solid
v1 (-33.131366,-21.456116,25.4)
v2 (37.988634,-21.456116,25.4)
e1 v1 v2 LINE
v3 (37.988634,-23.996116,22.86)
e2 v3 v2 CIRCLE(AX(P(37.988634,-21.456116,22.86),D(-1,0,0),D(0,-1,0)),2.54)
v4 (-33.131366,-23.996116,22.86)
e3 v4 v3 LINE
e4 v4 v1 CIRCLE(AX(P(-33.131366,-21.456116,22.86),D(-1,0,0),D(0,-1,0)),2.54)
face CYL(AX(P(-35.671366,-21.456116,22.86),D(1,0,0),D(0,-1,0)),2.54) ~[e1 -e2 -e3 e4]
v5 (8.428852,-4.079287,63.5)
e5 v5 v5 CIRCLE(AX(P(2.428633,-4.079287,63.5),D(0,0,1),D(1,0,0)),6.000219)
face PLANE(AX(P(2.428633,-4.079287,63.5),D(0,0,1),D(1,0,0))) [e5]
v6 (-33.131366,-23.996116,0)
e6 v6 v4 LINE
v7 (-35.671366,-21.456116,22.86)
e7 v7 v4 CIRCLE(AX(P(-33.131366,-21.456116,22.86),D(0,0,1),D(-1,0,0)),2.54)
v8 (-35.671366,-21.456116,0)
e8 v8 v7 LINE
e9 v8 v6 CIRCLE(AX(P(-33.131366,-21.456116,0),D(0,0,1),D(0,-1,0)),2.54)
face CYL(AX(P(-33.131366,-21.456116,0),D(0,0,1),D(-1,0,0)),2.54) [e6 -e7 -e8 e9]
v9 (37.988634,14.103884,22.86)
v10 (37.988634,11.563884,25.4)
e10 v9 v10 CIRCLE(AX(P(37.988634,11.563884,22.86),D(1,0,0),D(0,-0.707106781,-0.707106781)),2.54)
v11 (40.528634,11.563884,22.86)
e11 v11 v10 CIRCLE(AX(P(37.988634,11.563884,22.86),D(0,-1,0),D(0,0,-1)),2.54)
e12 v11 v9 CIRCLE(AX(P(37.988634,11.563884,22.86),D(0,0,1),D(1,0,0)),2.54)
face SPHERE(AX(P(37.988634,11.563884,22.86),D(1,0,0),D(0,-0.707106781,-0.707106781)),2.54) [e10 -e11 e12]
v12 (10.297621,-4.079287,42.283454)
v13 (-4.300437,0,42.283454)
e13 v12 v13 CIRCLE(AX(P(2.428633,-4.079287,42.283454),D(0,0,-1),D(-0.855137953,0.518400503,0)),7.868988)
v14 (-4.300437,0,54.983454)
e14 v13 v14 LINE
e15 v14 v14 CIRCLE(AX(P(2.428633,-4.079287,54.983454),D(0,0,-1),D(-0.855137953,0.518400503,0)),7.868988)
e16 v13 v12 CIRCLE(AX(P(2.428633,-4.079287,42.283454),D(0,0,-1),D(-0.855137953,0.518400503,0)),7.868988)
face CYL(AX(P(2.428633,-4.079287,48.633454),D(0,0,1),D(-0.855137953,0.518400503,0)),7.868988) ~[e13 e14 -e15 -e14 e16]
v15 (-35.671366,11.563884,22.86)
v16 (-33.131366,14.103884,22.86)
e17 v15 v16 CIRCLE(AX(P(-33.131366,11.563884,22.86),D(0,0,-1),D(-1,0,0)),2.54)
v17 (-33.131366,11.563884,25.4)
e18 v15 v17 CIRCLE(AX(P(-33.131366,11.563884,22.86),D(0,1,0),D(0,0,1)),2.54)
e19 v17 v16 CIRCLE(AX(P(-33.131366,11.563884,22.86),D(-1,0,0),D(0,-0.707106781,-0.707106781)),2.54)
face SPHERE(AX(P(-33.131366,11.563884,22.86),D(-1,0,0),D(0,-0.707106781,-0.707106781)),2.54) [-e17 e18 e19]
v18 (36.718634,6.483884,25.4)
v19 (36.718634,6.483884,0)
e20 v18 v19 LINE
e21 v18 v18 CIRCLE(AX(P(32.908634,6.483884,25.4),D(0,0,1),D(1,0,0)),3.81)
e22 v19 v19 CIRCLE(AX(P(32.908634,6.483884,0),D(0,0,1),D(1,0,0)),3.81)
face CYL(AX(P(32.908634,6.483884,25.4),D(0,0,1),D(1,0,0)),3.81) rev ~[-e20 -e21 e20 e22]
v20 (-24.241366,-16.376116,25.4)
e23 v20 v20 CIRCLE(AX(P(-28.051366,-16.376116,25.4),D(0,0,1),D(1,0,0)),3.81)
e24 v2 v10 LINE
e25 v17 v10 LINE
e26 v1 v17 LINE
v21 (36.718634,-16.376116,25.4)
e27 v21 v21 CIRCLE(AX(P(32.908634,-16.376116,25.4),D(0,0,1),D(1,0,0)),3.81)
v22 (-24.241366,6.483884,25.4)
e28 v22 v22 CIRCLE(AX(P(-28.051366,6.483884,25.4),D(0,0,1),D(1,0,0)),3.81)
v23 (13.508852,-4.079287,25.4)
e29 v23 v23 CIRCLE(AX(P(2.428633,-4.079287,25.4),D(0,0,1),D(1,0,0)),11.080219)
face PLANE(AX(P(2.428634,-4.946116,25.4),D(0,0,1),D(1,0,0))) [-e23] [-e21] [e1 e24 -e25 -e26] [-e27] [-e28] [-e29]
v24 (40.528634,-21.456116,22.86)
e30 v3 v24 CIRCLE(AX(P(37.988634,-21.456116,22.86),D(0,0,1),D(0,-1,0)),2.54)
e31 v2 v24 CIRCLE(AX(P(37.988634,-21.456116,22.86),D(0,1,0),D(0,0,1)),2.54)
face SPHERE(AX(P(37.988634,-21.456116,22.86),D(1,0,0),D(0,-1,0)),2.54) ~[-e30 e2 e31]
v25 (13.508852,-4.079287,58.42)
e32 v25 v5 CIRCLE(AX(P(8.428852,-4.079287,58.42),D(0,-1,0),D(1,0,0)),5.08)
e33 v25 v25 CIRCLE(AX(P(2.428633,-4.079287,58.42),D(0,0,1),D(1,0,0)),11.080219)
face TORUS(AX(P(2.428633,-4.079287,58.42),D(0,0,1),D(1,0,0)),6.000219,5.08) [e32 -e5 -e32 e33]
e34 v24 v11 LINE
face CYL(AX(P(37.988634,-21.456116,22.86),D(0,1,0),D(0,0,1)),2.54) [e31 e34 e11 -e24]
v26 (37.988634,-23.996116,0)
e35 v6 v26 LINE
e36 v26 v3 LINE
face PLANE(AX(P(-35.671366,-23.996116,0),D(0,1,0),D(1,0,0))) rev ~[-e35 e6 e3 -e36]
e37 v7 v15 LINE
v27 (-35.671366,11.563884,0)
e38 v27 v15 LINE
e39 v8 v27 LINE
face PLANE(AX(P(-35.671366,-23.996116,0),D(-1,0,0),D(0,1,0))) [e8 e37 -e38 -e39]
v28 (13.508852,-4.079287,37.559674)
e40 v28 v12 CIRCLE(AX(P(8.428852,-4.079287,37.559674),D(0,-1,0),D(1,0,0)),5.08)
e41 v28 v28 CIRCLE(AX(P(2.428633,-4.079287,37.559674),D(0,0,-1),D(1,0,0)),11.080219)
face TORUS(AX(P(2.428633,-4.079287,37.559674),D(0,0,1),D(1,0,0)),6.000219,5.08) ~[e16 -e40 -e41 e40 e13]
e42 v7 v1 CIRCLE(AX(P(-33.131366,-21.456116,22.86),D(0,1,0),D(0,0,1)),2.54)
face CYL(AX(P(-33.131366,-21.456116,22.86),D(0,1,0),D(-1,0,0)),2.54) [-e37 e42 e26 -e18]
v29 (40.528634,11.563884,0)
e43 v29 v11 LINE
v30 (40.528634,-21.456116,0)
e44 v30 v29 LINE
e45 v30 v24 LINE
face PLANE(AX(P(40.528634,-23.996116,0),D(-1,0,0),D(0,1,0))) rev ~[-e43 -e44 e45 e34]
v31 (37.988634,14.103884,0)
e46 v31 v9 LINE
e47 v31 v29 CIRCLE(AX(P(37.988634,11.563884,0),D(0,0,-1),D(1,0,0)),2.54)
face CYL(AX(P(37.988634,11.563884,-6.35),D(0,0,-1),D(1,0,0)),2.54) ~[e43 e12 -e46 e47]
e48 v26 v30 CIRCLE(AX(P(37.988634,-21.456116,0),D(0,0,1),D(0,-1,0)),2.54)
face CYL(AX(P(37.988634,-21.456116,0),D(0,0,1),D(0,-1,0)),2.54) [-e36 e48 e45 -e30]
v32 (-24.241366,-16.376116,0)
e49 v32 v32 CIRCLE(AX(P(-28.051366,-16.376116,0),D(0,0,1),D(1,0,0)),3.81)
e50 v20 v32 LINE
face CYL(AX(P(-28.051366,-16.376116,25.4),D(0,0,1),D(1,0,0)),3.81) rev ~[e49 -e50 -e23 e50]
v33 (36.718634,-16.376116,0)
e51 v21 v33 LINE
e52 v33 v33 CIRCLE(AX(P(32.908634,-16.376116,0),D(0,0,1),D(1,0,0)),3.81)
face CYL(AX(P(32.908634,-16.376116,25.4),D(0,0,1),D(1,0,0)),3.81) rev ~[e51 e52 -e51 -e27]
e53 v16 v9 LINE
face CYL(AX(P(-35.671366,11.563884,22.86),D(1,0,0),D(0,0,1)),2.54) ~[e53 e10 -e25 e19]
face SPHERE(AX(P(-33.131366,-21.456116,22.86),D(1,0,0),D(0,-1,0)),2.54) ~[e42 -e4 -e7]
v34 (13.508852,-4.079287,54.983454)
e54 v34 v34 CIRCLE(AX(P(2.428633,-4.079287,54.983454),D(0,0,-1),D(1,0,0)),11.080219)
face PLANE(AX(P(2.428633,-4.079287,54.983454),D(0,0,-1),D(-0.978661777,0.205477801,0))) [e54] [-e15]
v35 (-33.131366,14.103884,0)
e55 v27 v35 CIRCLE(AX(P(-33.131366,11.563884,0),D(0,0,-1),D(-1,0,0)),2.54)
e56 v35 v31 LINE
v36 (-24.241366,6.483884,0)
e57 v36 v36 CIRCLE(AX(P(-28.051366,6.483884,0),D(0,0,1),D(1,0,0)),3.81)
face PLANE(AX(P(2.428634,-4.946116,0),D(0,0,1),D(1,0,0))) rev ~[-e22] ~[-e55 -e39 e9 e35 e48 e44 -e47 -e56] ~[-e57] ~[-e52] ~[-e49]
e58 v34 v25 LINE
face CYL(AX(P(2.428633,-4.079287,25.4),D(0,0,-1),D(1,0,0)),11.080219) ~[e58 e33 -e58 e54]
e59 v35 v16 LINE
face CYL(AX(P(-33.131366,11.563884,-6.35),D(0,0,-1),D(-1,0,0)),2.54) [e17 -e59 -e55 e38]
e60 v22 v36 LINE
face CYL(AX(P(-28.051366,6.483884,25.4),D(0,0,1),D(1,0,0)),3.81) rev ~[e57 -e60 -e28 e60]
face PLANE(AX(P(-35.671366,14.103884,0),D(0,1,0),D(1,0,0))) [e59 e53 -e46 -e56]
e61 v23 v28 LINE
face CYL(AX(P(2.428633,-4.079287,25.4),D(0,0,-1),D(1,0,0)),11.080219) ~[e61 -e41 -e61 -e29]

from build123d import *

# Parameters (mm, degrees)
F0_W          = 76.2
F0_H          = 38.1
F1_DEPTH      = 25.4
F3_R          = 3.81
F4_DEPTH      = 25.4
F5_R          = 11.0802185983
F6_DEPTH      = 38.1
F2_R          = 3.81
F7_DEPTH      = 25.4
F8_R          = 3.81
F9_DEPTH      = 25.4
F11_R         = 3.81
F12_DEPTH     = 25.4
F10_W         = 12.7
F10_H         = 12.7
F14_R         = 2.54
F15_R         = 2.54
F17_T1_DEPTH  = 29.21
F17_S5_W      = 2.54
F17_S5_H      = 2.54
F17_T6_DEPTH  = 2.54
F17_S11_W     = 2.54
F17_S11_H     = 2.54
F17_T12_DEPTH = 2.54


# Not quite as in the source:
# - a fillet or chamfer that OpenCascade refuses, or shapes differently, is made with other operations: its cross-section is extruded or revolved along the edge and cut away or added


with BuildPart() as f1:
    # F0 (on Top) → F1 (new body)
    with BuildSketch(Plane.XY):
        with Locations((2.4286340922, -4.9461158044)):
            Rectangle(F0_W, F0_H)
    extrude(amount=F1_DEPTH)

    # F3 (on face) → F4 (cut)
    with BuildSketch(Plane.XY.offset(25.4)):
        with Locations((32.9086340922, 6.4838841956)):
            Circle(F3_R)
    extrude(amount=-F4_DEPTH, mode=Mode.SUBTRACT)

    # F5 (on face) → F6 (join)
    with BuildSketch(Plane.XY.offset(25.4)):
        with Locations((2.4286331609, -4.0792874061)):
            Circle(F5_R)
    extrude(amount=F6_DEPTH)

    # F2 (on face) → F7 (cut)
    with BuildSketch(Plane.XY.offset(25.4)):
        with Locations((-28.0513659078, 6.4838841956)):
            Circle(F2_R)
    extrude(amount=-F7_DEPTH, mode=Mode.SUBTRACT)

    # F8 (on face) → F9 (cut)
    with BuildSketch(Plane.XY.offset(25.4)):
        with Locations((-28.0513659078, -16.3761158044)):
            Circle(F8_R)
    extrude(amount=-F9_DEPTH, mode=Mode.SUBTRACT)

    # F11 (on face) → F12 (cut)
    with BuildSketch(Plane.XY.offset(25.4)):
        with Locations((32.9086340922, -16.3761158044)):
            Circle(F11_R)
    extrude(amount=-F12_DEPTH, mode=Mode.SUBTRACT)

    # F10 (on Front) → F13 (revolve, cut)
    with BuildSketch(Plane.XZ):
        with Locations((-10.6504372485, 48.6334538215)):
            Rectangle(F10_W, F10_H)
    revolve(axis=Axis((2.4286331609, -4.0792874061, 25.4), (0, 0, -1)), mode=Mode.SUBTRACT)

    # F14
    f14_edges = [f1.edges().sort_by_distance(p)[0] for p in [
        (2.428634, -23.996116, 25.4),
    ]]
    fillet(f14_edges, radius=F14_R)

    # F15
    f15_edges = [f1.edges().sort_by_distance(p)[0] for p in [
        (-35.671366, -3.676116, 25.4),
        (2.428634, 14.103884, 25.4),
        (40.528634, -3.676116, 25.4),
    ]]
    fillet(f15_edges, radius=F15_R)

    # F16: fillet of radius 5.08 on 2 edges, made by hand

    # F16_s1 → F16_t2 (revolve, cut)
    with BuildSketch(Plane.XZ.offset(4.0792874061)):
        with BuildLine():
            ThreePointArc((13.5088517592, 58.42), (12.0209542077, 62.0121024484), (8.4288517592, 63.5))
            Line((8.4288517592, 63.5), (8.4288517592, 63.6016))
            Line((8.4288517592, 63.6016), (13.6104517592, 63.6016))
            Line((13.6104517592, 63.6016), (13.6104517592, 58.42))
            Line((13.6104517592, 58.42), (13.5088517592, 58.42))
        make_face()
    revolve(axis=Axis((2.4286331609, -4.0792874061, 63.5), (0, 0, 1)), mode=Mode.SUBTRACT)

    # F16_s3 → F16_t4 (revolve, cut)
    with BuildSketch(Plane.XZ.offset(4.0792874061)):
        with BuildLine():
            ThreePointArc((13.5088517592, 37.5596735125), (12.630027146, 40.4156366371), (10.2976212989, 42.2834538215))
            Line((10.2976212989, 42.2834538215), (10.3349966897, 42.3779294277))
            ThreePointArc((10.3349966897, 42.3779294277), (11.9032365291, 42.3850538215), (13.5088517592, 42.3850538215))
            Line((13.5088517592, 42.3850538215), (13.6104517592, 42.2834538215))
            Line((13.6104517592, 42.2834538215), (13.6104517592, 37.5596735125))
            Line((13.6104517592, 37.5596735125), (13.5088517592, 37.5596735125))
        make_face()
    revolve(axis=Axis((2.4286331609, -4.0792874061, 42.2834538215), (0, 0, -1)), mode=Mode.SUBTRACT)

    # F17: fillet of radius 2.54 on 2 edges, made by hand

    # F17_s2 → F17_t1 (cut)
    with BuildSketch(Plane.XY.offset(-6.35)):
        with BuildLine():
            ThreePointArc((-35.6713659078, 11.5638841956), (-34.927417132, 13.3599354199), (-33.1313659078, 14.1038841956))
            Line((-33.1313659078, 14.1038841956), (-35.6713659078, 14.1038841956))
            Line((-35.6713659078, 14.1038841956), (-35.6713659078, 11.5638841956))
        make_face()
        with BuildLine():
            ThreePointArc((40.5286340922, 11.5638841956), (39.7846853164, 13.3599354199), (37.9886340922, 14.1038841956))
            Line((37.9886340922, 14.1038841956), (40.5286340922, 14.1038841956))
            Line((40.5286340922, 14.1038841956), (40.5286340922, 11.5638841956))
        make_face()
    extrude(amount=F17_T1_DEPTH, mode=Mode.SUBTRACT)


with BuildPart() as f17_tool4:
    # F17_s5 → F17_t6 (new body)
    with BuildSketch(Plane.YZ.offset(37.9886340922)):
        with Locations((12.8338841956, 24.13)):
            Rectangle(F17_S5_W, F17_S5_H)
    extrude(amount=F17_T6_DEPTH)

    # F17_s7 → F17_t8 (revolve, cut)
    with BuildSketch(Plane(origin=(37.9886340922, 11.5638841956, 22.86), x_dir=(0, -0.7071067812, -0.7071067812), z_dir=(0, -0.7071067812, 0.7071067812))):
        with BuildLine():
            ThreePointArc((0, -2.54), (2.54, 0), (0, 2.54))
            Line((0, 2.54), (0, -2.54))
        make_face()
    revolve(axis=Axis((37.9886340922, 11.5638841956, 22.86), (1, 0, 0)), mode=Mode.SUBTRACT)


with BuildPart() as f1_1:
    add(f1.part)

    # F17_t3: cut F17_tool4
    add(f17_tool4.part, mode=Mode.SUBTRACT)


with BuildPart() as f17_tool10:
    # F17_s11 → F17_t12 (new body)
    with BuildSketch(Plane.YZ.offset(-33.1313659078)):
        with Locations((12.8338841956, 24.13)):
            Rectangle(F17_S11_W, F17_S11_H)
    extrude(amount=-F17_T12_DEPTH)

    # F17_s13 → F17_t14 (revolve, cut)
    with BuildSketch(Plane(origin=(-33.1313659078, 11.5638841956, 22.86), x_dir=(0, -0.7071067812, -0.7071067812), z_dir=(0, 0.7071067812, -0.7071067812))):
        with BuildLine():
            ThreePointArc((0, -2.54), (2.54, 0), (0, 2.54))
            Line((0, 2.54), (0, -2.54))
        make_face()
    revolve(axis=Axis((-33.1313659078, 11.5638841956, 22.86), (-1, 0, 0)), mode=Mode.SUBTRACT)


with BuildPart() as f1_2:
    add(f1_1.part)

    # F17_t9: cut F17_tool10
    add(f17_tool10.part, mode=Mode.SUBTRACT)


solid = f1_2.part
